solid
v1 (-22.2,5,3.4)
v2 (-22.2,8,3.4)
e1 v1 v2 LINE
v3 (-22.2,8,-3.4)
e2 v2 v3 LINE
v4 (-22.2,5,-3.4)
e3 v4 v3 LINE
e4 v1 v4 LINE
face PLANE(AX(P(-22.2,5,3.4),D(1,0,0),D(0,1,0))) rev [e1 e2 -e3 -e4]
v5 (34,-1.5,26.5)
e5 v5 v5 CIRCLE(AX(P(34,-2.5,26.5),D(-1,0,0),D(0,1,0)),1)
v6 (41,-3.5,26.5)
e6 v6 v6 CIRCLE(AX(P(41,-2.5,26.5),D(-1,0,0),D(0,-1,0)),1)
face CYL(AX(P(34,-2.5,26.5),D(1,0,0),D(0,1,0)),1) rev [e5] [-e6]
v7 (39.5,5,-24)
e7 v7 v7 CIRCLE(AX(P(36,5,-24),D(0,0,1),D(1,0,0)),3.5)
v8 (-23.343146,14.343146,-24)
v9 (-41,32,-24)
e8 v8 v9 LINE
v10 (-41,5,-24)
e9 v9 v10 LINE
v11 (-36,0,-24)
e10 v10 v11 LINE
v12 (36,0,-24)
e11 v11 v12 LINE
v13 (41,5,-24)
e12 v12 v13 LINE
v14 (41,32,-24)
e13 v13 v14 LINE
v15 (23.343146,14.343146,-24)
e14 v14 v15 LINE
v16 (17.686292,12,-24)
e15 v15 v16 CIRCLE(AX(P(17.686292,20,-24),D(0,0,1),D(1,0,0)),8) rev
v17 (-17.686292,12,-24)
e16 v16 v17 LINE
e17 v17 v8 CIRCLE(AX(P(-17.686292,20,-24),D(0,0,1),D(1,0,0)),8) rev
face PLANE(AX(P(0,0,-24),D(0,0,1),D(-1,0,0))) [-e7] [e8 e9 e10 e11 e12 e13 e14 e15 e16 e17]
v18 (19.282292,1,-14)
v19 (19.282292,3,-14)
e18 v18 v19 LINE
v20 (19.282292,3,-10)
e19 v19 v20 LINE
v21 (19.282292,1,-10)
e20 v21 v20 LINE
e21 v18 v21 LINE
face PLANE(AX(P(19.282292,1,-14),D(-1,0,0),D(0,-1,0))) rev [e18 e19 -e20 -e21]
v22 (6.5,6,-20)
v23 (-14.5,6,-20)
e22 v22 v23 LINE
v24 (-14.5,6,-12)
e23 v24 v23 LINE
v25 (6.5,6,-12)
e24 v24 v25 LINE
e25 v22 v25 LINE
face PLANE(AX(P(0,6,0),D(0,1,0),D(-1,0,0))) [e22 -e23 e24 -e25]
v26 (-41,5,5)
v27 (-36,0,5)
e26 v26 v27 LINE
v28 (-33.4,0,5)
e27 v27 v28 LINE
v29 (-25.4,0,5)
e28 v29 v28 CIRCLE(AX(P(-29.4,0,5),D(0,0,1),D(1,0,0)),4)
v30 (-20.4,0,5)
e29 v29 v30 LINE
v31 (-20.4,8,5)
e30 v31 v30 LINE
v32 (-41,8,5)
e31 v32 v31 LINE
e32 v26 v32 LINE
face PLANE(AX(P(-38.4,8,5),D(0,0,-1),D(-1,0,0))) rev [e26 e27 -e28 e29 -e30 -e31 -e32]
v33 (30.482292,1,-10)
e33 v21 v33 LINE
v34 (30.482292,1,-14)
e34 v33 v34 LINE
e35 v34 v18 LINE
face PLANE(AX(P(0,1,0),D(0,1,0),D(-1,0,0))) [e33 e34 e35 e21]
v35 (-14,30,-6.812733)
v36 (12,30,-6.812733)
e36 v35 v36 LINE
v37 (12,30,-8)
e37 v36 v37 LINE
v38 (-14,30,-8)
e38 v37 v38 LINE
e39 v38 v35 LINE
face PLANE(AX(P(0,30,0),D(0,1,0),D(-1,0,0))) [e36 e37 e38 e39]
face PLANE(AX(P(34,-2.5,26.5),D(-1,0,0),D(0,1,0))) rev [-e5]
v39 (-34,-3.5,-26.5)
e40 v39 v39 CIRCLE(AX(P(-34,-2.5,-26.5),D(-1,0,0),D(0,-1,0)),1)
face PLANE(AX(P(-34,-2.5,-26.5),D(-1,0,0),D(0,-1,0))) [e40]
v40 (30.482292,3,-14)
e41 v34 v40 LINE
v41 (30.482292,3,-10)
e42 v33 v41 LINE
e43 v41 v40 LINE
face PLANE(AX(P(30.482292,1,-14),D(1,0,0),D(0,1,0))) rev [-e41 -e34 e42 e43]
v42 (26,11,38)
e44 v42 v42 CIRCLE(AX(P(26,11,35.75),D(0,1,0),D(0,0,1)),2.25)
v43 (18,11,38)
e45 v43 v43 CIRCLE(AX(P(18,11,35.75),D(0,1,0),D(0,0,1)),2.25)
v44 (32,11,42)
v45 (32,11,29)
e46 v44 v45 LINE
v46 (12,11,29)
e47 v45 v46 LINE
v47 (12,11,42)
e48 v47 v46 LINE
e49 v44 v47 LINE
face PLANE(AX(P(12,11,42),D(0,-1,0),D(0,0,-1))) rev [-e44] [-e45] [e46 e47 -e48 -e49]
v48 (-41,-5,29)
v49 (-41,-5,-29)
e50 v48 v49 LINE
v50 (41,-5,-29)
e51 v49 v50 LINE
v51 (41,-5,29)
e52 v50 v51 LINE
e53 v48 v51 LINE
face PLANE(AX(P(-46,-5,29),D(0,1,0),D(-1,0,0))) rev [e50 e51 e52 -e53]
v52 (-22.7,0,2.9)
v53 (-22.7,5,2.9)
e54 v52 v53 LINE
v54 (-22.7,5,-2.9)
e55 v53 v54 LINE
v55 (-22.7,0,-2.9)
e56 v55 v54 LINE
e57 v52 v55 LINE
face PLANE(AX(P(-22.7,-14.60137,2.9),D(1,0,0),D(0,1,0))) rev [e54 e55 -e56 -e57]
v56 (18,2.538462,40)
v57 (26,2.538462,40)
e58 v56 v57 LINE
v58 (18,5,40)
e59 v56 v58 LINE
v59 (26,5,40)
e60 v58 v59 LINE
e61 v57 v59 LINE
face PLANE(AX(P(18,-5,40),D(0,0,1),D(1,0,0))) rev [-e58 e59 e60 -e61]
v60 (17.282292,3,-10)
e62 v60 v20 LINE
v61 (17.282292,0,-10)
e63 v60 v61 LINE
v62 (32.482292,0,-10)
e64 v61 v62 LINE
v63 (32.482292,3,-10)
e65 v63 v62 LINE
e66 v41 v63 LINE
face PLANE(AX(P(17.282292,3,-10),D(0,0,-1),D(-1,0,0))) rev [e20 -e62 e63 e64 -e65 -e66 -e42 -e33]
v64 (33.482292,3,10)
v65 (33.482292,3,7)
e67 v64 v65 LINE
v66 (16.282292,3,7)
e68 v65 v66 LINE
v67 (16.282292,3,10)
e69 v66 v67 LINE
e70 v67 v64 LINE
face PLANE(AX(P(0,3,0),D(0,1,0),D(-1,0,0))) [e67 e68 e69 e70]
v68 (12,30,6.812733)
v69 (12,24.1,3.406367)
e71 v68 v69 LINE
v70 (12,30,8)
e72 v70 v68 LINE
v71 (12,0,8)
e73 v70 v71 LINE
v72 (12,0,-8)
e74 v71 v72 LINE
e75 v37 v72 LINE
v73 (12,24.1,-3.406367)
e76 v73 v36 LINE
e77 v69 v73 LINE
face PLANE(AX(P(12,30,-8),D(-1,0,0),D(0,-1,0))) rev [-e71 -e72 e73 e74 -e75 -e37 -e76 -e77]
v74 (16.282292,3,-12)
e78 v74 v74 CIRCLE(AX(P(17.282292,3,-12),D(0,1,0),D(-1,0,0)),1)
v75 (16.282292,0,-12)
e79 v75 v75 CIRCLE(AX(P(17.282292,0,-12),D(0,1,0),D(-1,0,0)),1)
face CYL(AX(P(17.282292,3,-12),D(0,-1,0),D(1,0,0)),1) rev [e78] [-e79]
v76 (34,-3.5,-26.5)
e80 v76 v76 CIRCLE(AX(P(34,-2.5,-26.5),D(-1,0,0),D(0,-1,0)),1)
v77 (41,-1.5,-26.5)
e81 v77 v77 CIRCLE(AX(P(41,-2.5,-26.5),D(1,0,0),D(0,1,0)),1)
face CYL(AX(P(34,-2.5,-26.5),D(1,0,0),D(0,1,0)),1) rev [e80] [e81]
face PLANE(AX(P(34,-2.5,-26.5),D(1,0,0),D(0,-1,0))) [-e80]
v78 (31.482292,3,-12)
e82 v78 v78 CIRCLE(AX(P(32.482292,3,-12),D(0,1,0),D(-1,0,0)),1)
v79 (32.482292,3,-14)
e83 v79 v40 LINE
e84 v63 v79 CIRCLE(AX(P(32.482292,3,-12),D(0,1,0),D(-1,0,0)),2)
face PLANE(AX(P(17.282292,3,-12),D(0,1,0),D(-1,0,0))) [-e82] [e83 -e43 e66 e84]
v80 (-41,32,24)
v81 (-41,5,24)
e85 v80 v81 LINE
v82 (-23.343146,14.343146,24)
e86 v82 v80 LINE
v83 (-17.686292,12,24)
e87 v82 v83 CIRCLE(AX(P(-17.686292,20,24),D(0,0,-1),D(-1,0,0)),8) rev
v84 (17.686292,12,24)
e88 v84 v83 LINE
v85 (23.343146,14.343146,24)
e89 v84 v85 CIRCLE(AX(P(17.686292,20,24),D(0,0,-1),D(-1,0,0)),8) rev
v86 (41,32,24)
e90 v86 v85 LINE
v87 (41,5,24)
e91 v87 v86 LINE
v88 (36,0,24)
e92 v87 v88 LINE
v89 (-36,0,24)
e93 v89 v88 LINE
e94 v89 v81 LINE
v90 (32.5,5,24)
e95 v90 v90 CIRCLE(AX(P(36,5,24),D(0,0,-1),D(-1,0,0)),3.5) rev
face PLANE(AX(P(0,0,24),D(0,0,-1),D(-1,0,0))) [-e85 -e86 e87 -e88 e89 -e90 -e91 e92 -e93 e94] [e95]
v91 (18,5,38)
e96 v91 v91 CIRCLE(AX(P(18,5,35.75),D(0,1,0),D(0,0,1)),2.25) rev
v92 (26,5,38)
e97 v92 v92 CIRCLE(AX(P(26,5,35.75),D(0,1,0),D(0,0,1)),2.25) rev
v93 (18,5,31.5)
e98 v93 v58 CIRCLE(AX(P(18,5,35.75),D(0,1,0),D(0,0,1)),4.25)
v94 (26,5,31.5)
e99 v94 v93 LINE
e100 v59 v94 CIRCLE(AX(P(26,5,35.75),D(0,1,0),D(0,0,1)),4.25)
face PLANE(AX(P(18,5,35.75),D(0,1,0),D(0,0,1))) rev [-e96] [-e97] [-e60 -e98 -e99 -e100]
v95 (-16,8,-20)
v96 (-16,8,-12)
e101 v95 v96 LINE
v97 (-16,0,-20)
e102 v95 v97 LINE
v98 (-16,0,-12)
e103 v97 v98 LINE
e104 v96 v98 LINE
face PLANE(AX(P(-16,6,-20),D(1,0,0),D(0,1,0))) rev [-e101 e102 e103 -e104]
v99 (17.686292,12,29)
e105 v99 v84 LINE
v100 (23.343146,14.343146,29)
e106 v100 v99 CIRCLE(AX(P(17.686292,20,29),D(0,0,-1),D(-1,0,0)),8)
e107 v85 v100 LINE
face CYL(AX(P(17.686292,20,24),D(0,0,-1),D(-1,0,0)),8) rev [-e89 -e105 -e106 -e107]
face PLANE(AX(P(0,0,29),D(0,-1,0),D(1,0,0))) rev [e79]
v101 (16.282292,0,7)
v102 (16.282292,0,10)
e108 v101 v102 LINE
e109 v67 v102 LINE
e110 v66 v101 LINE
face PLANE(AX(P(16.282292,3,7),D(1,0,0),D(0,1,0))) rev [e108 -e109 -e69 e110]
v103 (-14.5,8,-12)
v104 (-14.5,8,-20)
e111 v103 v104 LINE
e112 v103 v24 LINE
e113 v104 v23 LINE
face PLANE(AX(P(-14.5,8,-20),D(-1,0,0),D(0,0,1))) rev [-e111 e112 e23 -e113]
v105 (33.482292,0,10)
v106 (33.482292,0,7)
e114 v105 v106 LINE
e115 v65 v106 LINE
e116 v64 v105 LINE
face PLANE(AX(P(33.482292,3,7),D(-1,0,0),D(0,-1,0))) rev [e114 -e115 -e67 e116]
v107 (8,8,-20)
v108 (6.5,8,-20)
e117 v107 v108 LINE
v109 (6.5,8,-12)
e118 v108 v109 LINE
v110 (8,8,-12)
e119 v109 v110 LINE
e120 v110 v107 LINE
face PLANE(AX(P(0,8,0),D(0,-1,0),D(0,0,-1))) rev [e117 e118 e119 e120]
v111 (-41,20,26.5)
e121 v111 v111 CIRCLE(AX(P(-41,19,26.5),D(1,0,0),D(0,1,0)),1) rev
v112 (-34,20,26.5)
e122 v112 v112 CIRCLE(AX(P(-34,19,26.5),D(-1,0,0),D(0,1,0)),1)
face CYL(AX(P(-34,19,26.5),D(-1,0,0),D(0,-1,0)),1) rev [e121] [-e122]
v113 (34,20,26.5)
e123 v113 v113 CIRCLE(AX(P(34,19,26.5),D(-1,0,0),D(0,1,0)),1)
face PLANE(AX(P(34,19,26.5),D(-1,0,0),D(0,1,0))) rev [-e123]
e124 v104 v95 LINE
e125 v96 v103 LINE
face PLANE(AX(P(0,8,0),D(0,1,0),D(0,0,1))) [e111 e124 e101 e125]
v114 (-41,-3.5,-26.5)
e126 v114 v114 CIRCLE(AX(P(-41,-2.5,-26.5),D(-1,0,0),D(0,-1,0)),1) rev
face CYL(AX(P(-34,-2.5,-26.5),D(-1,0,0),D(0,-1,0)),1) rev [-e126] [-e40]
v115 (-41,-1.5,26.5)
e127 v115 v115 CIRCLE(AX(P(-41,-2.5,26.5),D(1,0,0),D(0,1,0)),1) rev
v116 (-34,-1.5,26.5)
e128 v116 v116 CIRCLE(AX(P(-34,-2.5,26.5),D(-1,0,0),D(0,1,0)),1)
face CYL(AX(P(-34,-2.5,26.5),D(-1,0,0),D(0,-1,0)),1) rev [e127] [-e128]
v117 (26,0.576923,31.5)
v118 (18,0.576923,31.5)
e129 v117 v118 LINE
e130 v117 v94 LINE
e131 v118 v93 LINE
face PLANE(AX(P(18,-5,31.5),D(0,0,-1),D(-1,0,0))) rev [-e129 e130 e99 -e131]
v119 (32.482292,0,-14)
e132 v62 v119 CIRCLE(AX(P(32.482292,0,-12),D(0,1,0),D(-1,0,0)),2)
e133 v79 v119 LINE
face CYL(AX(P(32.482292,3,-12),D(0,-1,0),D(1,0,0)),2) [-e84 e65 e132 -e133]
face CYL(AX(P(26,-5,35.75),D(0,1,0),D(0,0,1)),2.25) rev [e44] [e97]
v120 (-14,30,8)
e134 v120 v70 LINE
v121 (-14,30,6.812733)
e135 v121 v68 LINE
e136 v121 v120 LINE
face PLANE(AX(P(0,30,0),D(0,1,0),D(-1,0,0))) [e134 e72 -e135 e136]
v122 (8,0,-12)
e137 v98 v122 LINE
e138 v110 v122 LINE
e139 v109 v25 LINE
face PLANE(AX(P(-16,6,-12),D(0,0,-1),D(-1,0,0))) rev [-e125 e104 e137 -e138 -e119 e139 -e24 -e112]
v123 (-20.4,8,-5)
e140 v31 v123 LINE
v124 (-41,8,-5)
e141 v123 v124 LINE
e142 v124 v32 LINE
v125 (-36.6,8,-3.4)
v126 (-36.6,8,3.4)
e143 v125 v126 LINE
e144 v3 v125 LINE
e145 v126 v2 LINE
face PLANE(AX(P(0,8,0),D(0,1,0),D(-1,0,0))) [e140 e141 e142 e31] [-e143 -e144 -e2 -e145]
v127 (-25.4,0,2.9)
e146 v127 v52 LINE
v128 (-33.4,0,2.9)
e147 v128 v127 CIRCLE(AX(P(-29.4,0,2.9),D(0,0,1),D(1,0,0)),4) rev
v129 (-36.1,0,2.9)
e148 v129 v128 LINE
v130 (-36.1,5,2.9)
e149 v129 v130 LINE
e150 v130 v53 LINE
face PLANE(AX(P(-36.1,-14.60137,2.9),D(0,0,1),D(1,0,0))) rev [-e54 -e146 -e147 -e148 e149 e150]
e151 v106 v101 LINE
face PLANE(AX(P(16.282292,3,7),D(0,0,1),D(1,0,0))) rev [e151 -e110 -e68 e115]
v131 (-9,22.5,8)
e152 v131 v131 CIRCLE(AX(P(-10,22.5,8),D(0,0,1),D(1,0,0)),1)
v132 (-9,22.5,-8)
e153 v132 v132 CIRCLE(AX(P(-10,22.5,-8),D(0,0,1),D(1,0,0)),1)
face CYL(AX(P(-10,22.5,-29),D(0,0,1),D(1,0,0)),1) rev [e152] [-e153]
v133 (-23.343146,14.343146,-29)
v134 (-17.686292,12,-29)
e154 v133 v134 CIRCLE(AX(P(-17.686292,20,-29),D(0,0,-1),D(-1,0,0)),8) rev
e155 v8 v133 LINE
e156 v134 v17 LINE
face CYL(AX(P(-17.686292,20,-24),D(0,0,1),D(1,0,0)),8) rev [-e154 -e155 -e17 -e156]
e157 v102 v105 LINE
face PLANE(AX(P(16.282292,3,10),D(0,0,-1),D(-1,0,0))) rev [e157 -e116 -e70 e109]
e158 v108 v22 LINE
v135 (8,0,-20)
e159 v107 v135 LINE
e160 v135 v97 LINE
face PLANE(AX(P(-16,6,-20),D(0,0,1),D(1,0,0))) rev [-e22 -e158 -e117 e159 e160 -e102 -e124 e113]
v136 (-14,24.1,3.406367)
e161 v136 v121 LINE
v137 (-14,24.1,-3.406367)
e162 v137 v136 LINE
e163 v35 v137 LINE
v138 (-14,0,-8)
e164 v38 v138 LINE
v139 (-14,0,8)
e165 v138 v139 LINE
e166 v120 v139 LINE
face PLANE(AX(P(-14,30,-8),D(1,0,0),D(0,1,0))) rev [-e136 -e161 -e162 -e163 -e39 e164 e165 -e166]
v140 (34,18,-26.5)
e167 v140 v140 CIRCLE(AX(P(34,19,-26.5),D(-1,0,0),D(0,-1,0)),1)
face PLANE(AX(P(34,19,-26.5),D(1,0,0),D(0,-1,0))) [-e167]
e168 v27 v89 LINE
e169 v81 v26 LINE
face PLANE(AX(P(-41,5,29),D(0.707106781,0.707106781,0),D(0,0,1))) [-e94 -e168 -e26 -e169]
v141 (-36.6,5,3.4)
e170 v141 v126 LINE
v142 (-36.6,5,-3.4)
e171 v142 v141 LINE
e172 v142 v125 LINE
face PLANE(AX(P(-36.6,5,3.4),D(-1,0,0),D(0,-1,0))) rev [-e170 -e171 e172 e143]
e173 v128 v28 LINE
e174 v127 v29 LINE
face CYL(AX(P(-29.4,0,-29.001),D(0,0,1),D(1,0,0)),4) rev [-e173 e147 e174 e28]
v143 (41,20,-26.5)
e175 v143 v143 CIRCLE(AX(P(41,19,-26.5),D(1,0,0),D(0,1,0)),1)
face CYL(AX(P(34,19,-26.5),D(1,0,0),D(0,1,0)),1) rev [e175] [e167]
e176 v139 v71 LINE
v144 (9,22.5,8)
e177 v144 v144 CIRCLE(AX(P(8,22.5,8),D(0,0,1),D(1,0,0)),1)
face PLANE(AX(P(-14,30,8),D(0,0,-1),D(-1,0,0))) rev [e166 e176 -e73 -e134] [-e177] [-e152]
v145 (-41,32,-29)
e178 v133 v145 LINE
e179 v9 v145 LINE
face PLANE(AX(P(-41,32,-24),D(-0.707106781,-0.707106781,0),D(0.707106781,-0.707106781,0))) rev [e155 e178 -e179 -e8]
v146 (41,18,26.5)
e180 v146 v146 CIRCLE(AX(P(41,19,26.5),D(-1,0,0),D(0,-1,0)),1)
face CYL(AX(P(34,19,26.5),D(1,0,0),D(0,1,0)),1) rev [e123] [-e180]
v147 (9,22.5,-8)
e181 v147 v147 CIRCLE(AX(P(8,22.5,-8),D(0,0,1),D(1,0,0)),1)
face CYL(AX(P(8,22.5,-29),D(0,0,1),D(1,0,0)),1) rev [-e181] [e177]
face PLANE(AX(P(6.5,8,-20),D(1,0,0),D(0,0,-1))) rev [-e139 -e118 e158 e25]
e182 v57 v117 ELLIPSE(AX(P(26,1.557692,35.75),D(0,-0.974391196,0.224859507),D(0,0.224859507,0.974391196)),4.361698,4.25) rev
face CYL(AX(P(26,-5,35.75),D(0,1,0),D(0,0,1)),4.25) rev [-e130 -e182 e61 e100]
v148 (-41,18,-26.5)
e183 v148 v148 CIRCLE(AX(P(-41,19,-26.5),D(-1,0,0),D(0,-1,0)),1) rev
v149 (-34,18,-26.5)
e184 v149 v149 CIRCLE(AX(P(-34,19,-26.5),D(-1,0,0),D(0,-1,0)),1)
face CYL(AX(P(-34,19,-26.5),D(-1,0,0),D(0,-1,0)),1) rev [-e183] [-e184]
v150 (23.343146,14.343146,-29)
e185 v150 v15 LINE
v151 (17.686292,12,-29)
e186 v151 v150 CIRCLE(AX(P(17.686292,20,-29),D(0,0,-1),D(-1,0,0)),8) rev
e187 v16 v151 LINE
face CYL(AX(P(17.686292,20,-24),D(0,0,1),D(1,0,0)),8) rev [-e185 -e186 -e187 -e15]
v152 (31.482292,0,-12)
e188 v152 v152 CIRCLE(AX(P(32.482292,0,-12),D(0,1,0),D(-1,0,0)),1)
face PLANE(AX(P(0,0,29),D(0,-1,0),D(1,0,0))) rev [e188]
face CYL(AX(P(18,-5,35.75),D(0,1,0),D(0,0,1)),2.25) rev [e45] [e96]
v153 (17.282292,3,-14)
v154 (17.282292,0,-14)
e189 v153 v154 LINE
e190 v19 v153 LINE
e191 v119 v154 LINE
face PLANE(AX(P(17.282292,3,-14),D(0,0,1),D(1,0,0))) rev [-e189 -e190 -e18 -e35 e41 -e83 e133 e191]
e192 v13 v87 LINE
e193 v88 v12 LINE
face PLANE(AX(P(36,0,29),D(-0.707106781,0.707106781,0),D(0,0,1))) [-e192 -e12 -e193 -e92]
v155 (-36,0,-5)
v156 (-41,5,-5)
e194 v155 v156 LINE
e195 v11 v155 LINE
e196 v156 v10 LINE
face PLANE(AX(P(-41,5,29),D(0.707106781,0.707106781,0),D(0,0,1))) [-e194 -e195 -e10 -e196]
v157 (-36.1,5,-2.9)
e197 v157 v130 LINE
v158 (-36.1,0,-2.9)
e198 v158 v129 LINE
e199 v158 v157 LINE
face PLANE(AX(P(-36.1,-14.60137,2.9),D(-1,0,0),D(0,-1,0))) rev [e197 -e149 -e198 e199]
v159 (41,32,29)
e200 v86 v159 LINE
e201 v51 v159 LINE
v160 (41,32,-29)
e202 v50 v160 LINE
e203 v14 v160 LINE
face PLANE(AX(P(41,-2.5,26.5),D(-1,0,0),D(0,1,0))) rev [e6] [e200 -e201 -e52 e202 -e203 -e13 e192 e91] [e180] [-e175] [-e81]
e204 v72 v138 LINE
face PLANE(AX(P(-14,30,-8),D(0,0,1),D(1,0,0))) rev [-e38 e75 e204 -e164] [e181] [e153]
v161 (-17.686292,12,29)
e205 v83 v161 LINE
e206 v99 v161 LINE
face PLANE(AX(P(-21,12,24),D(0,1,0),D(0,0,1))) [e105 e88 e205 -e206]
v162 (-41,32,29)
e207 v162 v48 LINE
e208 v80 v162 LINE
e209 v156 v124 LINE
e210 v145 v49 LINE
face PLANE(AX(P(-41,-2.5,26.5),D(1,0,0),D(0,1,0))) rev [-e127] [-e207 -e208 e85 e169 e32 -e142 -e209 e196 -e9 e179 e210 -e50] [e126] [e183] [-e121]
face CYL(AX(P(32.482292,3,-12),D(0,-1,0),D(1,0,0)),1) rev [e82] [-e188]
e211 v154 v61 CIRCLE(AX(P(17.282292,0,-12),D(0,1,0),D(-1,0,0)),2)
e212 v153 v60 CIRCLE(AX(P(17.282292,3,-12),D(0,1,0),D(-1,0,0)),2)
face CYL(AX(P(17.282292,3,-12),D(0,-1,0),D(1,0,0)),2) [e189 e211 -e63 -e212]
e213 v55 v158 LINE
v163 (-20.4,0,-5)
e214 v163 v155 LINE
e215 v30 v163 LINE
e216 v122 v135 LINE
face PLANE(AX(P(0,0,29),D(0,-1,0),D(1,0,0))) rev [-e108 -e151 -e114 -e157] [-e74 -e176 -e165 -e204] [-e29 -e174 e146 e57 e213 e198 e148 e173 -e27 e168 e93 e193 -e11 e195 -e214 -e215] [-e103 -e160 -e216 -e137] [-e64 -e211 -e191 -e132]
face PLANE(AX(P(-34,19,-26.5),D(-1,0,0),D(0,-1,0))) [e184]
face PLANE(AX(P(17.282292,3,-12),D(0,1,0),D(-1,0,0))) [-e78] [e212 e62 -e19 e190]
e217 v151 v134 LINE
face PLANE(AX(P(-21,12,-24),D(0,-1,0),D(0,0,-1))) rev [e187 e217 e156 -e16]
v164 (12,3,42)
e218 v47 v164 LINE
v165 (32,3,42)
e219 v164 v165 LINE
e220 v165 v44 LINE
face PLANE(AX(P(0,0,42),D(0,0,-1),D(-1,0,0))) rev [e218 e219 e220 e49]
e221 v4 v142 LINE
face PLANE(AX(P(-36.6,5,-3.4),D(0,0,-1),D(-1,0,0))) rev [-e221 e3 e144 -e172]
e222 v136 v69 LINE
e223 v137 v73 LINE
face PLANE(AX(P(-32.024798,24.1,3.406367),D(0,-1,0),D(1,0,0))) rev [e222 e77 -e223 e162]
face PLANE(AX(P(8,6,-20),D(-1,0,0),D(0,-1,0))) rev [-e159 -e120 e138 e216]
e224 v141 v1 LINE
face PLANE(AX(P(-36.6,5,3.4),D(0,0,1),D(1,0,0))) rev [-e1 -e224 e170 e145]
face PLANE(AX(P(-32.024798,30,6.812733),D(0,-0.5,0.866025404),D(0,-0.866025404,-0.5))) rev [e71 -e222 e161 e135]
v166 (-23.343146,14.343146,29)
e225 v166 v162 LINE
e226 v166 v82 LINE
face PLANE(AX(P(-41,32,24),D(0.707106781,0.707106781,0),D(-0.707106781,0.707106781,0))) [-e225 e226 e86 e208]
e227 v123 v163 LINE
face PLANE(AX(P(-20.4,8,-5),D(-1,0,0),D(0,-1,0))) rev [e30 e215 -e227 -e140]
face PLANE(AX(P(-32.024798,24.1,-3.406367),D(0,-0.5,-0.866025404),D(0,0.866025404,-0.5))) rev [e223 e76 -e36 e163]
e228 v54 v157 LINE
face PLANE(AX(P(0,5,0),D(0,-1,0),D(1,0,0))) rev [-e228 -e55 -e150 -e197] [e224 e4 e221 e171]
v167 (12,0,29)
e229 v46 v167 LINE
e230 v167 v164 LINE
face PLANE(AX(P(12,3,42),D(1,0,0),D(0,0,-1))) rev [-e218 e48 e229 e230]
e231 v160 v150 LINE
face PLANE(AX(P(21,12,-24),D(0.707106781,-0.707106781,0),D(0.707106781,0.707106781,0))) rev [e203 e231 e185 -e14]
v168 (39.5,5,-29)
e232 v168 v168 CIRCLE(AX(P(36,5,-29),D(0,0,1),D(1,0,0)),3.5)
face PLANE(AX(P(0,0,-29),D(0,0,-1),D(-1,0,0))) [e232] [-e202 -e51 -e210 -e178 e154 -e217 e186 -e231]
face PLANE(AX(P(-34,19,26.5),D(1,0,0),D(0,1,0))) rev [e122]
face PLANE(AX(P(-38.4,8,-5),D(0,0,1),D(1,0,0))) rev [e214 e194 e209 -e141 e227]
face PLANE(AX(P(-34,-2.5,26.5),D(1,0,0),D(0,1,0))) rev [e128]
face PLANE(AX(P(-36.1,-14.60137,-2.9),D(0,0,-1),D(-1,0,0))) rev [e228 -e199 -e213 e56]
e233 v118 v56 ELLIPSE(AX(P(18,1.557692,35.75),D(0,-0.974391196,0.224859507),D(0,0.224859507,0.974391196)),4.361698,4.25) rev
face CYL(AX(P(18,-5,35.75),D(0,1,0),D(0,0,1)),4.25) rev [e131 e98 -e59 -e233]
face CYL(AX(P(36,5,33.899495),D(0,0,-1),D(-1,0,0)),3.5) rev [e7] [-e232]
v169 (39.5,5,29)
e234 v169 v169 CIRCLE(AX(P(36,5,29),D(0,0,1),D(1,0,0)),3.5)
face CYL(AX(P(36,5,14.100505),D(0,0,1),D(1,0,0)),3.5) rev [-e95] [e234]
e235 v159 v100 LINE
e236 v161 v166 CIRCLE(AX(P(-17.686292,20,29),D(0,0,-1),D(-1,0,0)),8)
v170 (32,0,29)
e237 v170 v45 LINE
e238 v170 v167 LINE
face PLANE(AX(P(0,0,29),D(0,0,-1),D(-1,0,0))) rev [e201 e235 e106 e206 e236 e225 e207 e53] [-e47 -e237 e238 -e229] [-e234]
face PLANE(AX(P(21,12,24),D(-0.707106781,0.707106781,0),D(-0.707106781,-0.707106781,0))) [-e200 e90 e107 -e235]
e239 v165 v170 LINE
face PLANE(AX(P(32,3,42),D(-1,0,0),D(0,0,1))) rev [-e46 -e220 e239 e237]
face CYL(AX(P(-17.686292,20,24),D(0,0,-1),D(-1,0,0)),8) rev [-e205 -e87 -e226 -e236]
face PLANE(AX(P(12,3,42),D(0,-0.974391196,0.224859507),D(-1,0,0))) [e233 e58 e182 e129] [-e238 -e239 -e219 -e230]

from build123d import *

# Parameters (mm, degrees)
RESSALTO_EXTRUS_O1_DEPTH  = 29
CORTE_EXTRUS_O1_REACH     = 115.6
ESBO_O2_R                 = 6.5
ESBO_O3_R                 = 18
CORTE_EXTRUS_O2_DEPTH     = 2.5
CORTE_EXTRUS_O3_START     = -5
ESBO_O5_R                 = 2
ESBO_O5_R_2               = 1.5
CORTE_EXTRUS_O3_DEPTH     = 5
ESBO_O7_R                 = 12
ESBO_O7_R_2               = 2
CORTE_EXTRUS_O4_DEPTH     = 110.590145542
ESBO_O11_W                = 18
ESBO_O11_H                = 10
RESSALTO_EXTRUS_O3_DEPTH  = 8
ESBO_O12_W                = 14.4
ESBO_O12_H                = 6.8
CORTE_EXTRUS_O6_DEPTH     = 3
ESBO_O13_W                = 13.4
ESBO_O13_H                = 5.8
CORTE_EXTRUS_O7_DEPTH     = 5
CORTE_EXTRUS_O8_REACH     = 84.898
RESSALTO_EXTRUS_O4_DEPTH  = 5
ESBO_O17_W                = 2.6
ESBO_O17_H                = 10
RESSALTO_EXTRUS_O5_DEPTH  = 8
CHANFRO1_SIZE             = 5
FILETE1_R                 = 8
ESBO_O18_W                = 20
ESBO_O18_H                = 8
RESSALTO_EXTRUS_O6_DEPTH  = 13
ESBO_O19_R                = 2.25
CORTE_EXTRUS_O9_DEPTH     = 80.252760204
CHANFRO2_SIZE             = 3
CHANFRO2_SIZE_2           = 13
CORTE_EXTRUS_O10_START    = -6
CORTE_EXTRUS_O10_DEPTH    = 74.252760204
ESBO_O21_W                = 26
ESBO_O21_H                = 16
RESSALTO_EXTRUS_O7_DEPTH  = 30
CORTE_EXTRUS_O11_DEPTH    = 26
ESBO_O24_R                = 1
ESBO_O24_W                = 17.2
ESBO_O24_H                = 3
RESSALTO_EXTRUS_O8_DEPTH  = 3
ESBO_O25_W                = 11.2
ESBO_O25_H                = 4
CORTE_EXTRUS_O12_DEPTH    = 2
ESBO_O26_R                = 3.5
CORTE_EXTRUS_O13_DEPTH    = 5
ESBO_O27_W                = 24
ESBO_O27_H                = 8
RESSALTO_EXTRUS_O9_DEPTH  = 6
ESBO_O28_W                = 1.5
ESBO_O28_H                = 8
RESSALTO_EXTRUS_O10_DEPTH = 2
ESBO_O31_R                = 1
CORTE_EXTRUS_O14_DEPTH    = 85.172442046
ESBO_O32_R                = 1
CORTE_EXTRUS_O15_DEPTH    = 12
ESBO_O33_R                = 1.25
CORTE_EXTRUS_O16_DEPTH    = 5
CORTE_EXTRUS_O17_DEPTH    = 2
ESBO_O38_R                = 62.548775677
CORTE_EXTRUS_O20_DEPTH    = 114.723348526
ESBO_O39_R                = 54.583555182
CORTE_EXTRUS_O21_DEPTH    = 110.945441015


with BuildPart() as part:
    # Esboço1 → Ressalto-extrusão1 (new, symmetric)
    with BuildSketch(Plane.XY):
        Polygon((0, 0), (-41, 0), (-41, 60), (-46, 60), (-46, -5), (46, -5), (46, 60), (41, 60), (41, 0), align=None)
    extrude(amount=RESSALTO_EXTRUS_O1_DEPTH, both=True)

    # Esboço2 → Corte-extrusão1 (cut, up to next)
    with BuildSketch(Plane.ZY.offset(46), mode=Mode.PRIVATE) as corte_extrus_o1_sk1:
        with Locations(Location((0, 30, 0), (0, 0, 270))):
            Circle(ESBO_O2_R)
    corte_extrus_o1_tool1 = extrude(corte_extrus_o1_sk1.sketch, amount=-CORTE_EXTRUS_O1_REACH, mode=Mode.PRIVATE) & part.part
    add(corte_extrus_o1_tool1.solids().sort_by_distance((-46, 30, 0))[0], mode=Mode.SUBTRACT)

    # Esboço3 → Corte-extrusão2 (cut)
    with BuildSketch(Plane.ZY.offset(46)):
        with Locations(Location((0, 30, 0), (0, 0, 270))):
            Circle(ESBO_O3_R)
    extrude(amount=-CORTE_EXTRUS_O2_DEPTH, mode=Mode.SUBTRACT)

    # Esboço5 → Corte-extrusão3 (cut)
    with BuildSketch(Plane.ZY.offset(46).offset(CORTE_EXTRUS_O3_START)):
        with Locations(Location((-15.5, 45.5, 0), (0, 0, 270))):
            Circle(ESBO_O5_R)
        with Locations(Location((0, 42, 0), (0, 0, 270))):
            Circle(ESBO_O5_R_2)
        with Locations(Location((0, 18, 0), (0, 0, 270))):
            Circle(ESBO_O5_R_2)
        with Locations(Location((0, 54, 0), (0, 0, 270))):
            Circle(ESBO_O5_R)
        with Locations(Location((15.5, 45.5, 0), (0, 0, 270))):
            Circle(ESBO_O5_R)
        with Locations(Location((15.5, 14.5, 0), (0, 0, 270))):
            Circle(ESBO_O5_R)
        with Locations(Location((-15.5, 14.5, 0), (0, 0, 270))):
            Circle(ESBO_O5_R)
        with Locations(Location((20.784609691, 18, 0), (0, 0, 270))):
            Circle(ESBO_O5_R)
        with Locations(Location((-20.784609691, 18, 0), (0, 0, 270))):
            Circle(ESBO_O5_R)
        with BuildLine():
            Line((-8, 31.5), (8, 31.5))
            ThreePointArc((8, 31.5), (9.5, 30), (8, 28.5))
            Line((8, 28.5), (-8, 28.5))
            ThreePointArc((-8, 28.5), (-9.5, 30), (-8, 31.5))
        make_face()
    extrude(amount=CORTE_EXTRUS_O3_DEPTH, mode=Mode.SUBTRACT)

    # Esboço7 → Corte-extrusão4 (cut, through all)
    with BuildSketch(Plane.ZY.offset(-41)):
        with Locations(Location((0, 30, 0), (0, 0, 270))):
            Circle(ESBO_O7_R)
        with Locations(Location((-15.5, 45.5, 0), (0, 0, 270))):
            Circle(ESBO_O7_R_2)
        with Locations(Location((15.5, 45.5, 0), (0, 0, 270))):
            Circle(ESBO_O7_R_2)
        with Locations(Location((15.5, 14.5, 0), (0, 0, 270))):
            Circle(ESBO_O7_R_2)
        with Locations(Location((-15.5, 14.5, 0), (0, 0, 270))):
            Circle(ESBO_O7_R_2)
    extrude(amount=-CORTE_EXTRUS_O4_DEPTH, mode=Mode.SUBTRACT)

    # Esboço11 → Ressalto-extrusão3 (add)
    with BuildSketch(Plane(origin=(0, 0, 0), x_dir=(1, 0, 0), z_dir=(0, 1, 0))):
        with Locations((-29.4, 0)):
            Rectangle(ESBO_O11_W, ESBO_O11_H)
    extrude(amount=RESSALTO_EXTRUS_O3_DEPTH)

    # Esboço12 → Corte-extrusão6 (cut)
    with BuildSketch(Plane(origin=(0, 8, 0), x_dir=(1, 0, 0), z_dir=(0, 1, 0))):
        with Locations((-29.4, 0)):
            Rectangle(ESBO_O12_W, ESBO_O12_H)
    extrude(amount=-CORTE_EXTRUS_O6_DEPTH, mode=Mode.SUBTRACT)

    # Esboço13 → Corte-extrusão7 (cut)
    with BuildSketch(Plane(origin=(0, 5, 0), x_dir=(1, 0, 0), z_dir=(0, 1, 0))):
        with Locations((-29.4, 0)):
            Rectangle(ESBO_O13_W, ESBO_O13_H)
    extrude(amount=-CORTE_EXTRUS_O7_DEPTH, mode=Mode.SUBTRACT)

    # Esboço14 → Corte-extrusão8 (cut, up to next)
    with BuildSketch(Plane.XY.offset(5), mode=Mode.PRIVATE) as corte_extrus_o8_sk1:
        with BuildLine():
            Line((-33.4, 0), (-25.4, 0))
            ThreePointArc((-25.4, 0), (-29.4, 4), (-33.4, 0))
        make_face()
    corte_extrus_o8_tool1 = extrude(corte_extrus_o8_sk1.sketch, amount=-CORTE_EXTRUS_O8_REACH, mode=Mode.PRIVATE) & part.part
    add(corte_extrus_o8_tool1.solids().sort_by_distance((-29.4, 1.697653, 5))[0], mode=Mode.SUBTRACT)

    # Esboço16 → Ressalto-extrusão4 (add)
    with BuildSketch(Plane.XY.offset(29)):
        Polygon((-41, 32), (-21, 12), (21, 12), (41, 32), (41, 0), (-41, 0), align=None)
    ressalto_extrus_o4 = extrude(amount=-RESSALTO_EXTRUS_O4_DEPTH)

    # Espelhar1: Ressalto-extrusão4 across plane
    add(ressalto_extrus_o4.mirror(Plane.XY))

    # Esboço17 → Ressalto-extrusão5 (add)
    with BuildSketch(Plane(origin=(0, 8, 0), x_dir=(1, 0, 0), z_dir=(0, 1, 0))):
        with Locations((-39.7, 0)):
            Rectangle(ESBO_O17_W, ESBO_O17_H)
    extrude(amount=-RESSALTO_EXTRUS_O5_DEPTH)

    # Chanfro1
    chanfro1_edges = [part.edges().sort_by_distance(p)[0] for p in [
        (41, 0, 0),
        (-41, 0, 14.5),
        (-41, 0, -14.5),
    ]]
    chamfer(chanfro1_edges, length=CHANFRO1_SIZE)

    # Filete1
    filete1_edges = [part.edges().sort_by_distance(p)[0] for p in [
        (-43.5, 60, -29),
        (-43.5, 60, 29),
        (-21, 12, 26.5),
        (21, 12, 26.5),
        (21, 12, -26.5),
        (-21, 12, -26.5),
        (43.5, 60, 29),
        (43.5, 60, -29),
    ]]
    fillet(filete1_edges, radius=FILETE1_R)

    # Esboço18 → Ressalto-extrusão6 (add)
    with BuildSketch(Plane.XY.offset(29)):
        with Locations((22, 7)):
            Rectangle(ESBO_O18_W, ESBO_O18_H)
    extrude(amount=RESSALTO_EXTRUS_O6_DEPTH)

    # Esboço19 → Corte-extrusão9 (cut, through all)
    with BuildSketch(Plane(origin=(0, 11, 0), x_dir=(1, 0, 0), z_dir=(0, 1, 0))):
        with Locations(Location((18, -35.75, 0), (0, 0, 270))):
            Circle(ESBO_O19_R)
        with Locations(Location((26, -35.75, 0), (0, 0, 270))):
            Circle(ESBO_O19_R)
    extrude(amount=-CORTE_EXTRUS_O9_DEPTH, mode=Mode.SUBTRACT)

    # Chanfro2
    # the kernel refuses this chamfer: 13, 3 mm, written as the material it adds along each edge
    with BuildSketch(Plane(origin=(12, 3, 29), x_dir=(0, -0.987043568605235, -0.1604524654688814), z_dir=(1, 0, 0))) as chanfro2_piece_1_section:
        Polygon((CHANFRO2_SIZE * 0.987043568605, -CHANFRO2_SIZE * 0.160452465469), (-CHANFRO2_SIZE_2 * 0.160452465469, -CHANFRO2_SIZE_2 * 0.987043568605), (0, 0), align=None)
    chanfro2_piece_1 = extrude(amount=20, mode=Mode.PRIVATE)
    chanfro2_piece_1 = split(chanfro2_piece_1, bisect_by=Plane(origin=(21.999997786, 2.099377296, 42), z_dir=(0, 0, -1)), keep=Keep.TOP, mode=Mode.PRIVATE)
    chanfro2_piece_1 = chanfro2_piece_1 - Plane(origin=(18, 2.099377296, 35.75), x_dir=(0, 0, 1), z_dir=(0, 1, 0)) * Cylinder(2.25, 92, mode=Mode.PRIVATE)
    chanfro2_piece_1 = chanfro2_piece_1 - Plane(origin=(26, 2.099377296, 35.75), x_dir=(0, 0, 1), z_dir=(0, 1, 0)) * Cylinder(2.25, 92, mode=Mode.PRIVATE)
    add(chanfro2_piece_1)

    # Esboço20 → Corte-extrusão10 (cut, through all)
    with BuildSketch(Plane(origin=(0, 11, 0), x_dir=(1, 0, 0), z_dir=(0, 1, 0)).offset(CORTE_EXTRUS_O10_START)):
        with BuildLine():
            Line((18, -31.5), (26, -31.5))
            ThreePointArc((26, -31.5), (30.25, -35.75), (26, -40))
            Line((26, -40), (18, -40))
            ThreePointArc((18, -40), (13.75, -35.75), (18, -31.5))
        make_face()
    extrude(amount=-CORTE_EXTRUS_O10_DEPTH, mode=Mode.SUBTRACT)

    # Esboço21 → Ressalto-extrusão7 (add)
    with BuildSketch(Plane(origin=(0, 0, 0), x_dir=(1, 0, 0), z_dir=(0, 1, 0))):
        with Locations((-1, 0)):
            Rectangle(ESBO_O21_W, ESBO_O21_H)
    extrude(amount=RESSALTO_EXTRUS_O7_DEPTH)

    # Esboço22 → Corte-extrusão11 (cut)
    with BuildSketch(Plane(origin=(12, 0, 0), x_dir=(0, 0, -1), z_dir=(1, 0, 0))):
        Polygon((6.812733176, 30), (3.406366588, 35.9), (-3.406366588, 35.9), (-6.812733176, 30), (-3.406366588, 24.1), (3.406366588, 24.1), align=None)
    extrude(amount=-CORTE_EXTRUS_O11_DEPTH, mode=Mode.SUBTRACT)

    # Esboço24 → Ressalto-extrusão8 (add)
    # profile 1 of 2: a face of its own
    with BuildSketch(Plane(origin=(0, 0, 0), x_dir=(1, 0, 0), z_dir=(0, 1, 0))):
        with BuildLine():
            Line((17.282291959, 14), (32.482291959, 14))
            ThreePointArc((32.482291959, 14), (34.482291959, 12), (32.482291959, 10))
            Line((32.482291959, 10), (17.282291959, 10))
            ThreePointArc((17.282291959, 10), (15.282291959, 12), (17.282291959, 14))
        make_face()
        with Locations(Location((17.282291959, 12, 0), (0, 0, 180))):
            Circle(ESBO_O24_R, mode=Mode.SUBTRACT)
        with Locations(Location((32.482291959, 12, 0), (0, 0, 180))):
            Circle(ESBO_O24_R, mode=Mode.SUBTRACT)
    # profile 2 of 2: a face of its own
    with BuildSketch(Plane(origin=(0, 0, 0), x_dir=(1, 0, 0), z_dir=(0, 1, 0))):
        with Locations((24.882291959, -8.5)):
            Rectangle(ESBO_O24_W, ESBO_O24_H)
    extrude(amount=RESSALTO_EXTRUS_O8_DEPTH)

    # Esboço25 → Corte-extrusão12 (cut)
    with BuildSketch(Plane(origin=(0, 3, 0), x_dir=(1, 0, 0), z_dir=(0, 1, 0))):
        with Locations((24.882291959, 12)):
            Rectangle(ESBO_O25_W, ESBO_O25_H)
    extrude(amount=-CORTE_EXTRUS_O12_DEPTH, mode=Mode.SUBTRACT)

    # Esboço26 → Corte-extrusão13 (cut)
    with BuildSketch(Plane.XY.offset(29)):
        with Locations((36, 5)):
            Circle(ESBO_O26_R)
    corte_extrus_o13 = extrude(amount=-CORTE_EXTRUS_O13_DEPTH, mode=Mode.SUBTRACT)

    # Esboço27 → Ressalto-extrusão9 (add)
    with BuildSketch(Plane(origin=(0, 0, 0), x_dir=(1, 0, 0), z_dir=(0, 1, 0))):
        with Locations((-4, 16)):
            Rectangle(ESBO_O27_W, ESBO_O27_H)
    extrude(amount=RESSALTO_EXTRUS_O9_DEPTH)

    # Esboço28 → Ressalto-extrusão10 (add)
    with BuildSketch(Plane(origin=(0, 6, 0), x_dir=(1, 0, 0), z_dir=(0, 1, 0))):
        with Locations((-15.25, 16)):
            Rectangle(ESBO_O28_W, ESBO_O28_H)
        with Locations((7.25, 16)):
            Rectangle(ESBO_O28_W, ESBO_O28_H)
    extrude(amount=RESSALTO_EXTRUS_O10_DEPTH)

    # Esboço31 → Corte-extrusão14 (cut, through all)
    with BuildSketch(Plane.XY.offset(8)):
        with Locations((-10, 22.5)):
            Circle(ESBO_O31_R)
        with Locations((8, 22.5)):
            Circle(ESBO_O31_R)
    extrude(amount=-CORTE_EXTRUS_O14_DEPTH, mode=Mode.SUBTRACT)

    # Esboço32 → Corte-extrusão15 (cut)
    with BuildSketch(Plane.ZY.offset(46)):
        with Locations(Location((-26.5, -2.5, 0), (0, 0, 270))):
            Circle(ESBO_O32_R)
        with Locations(Location((-26.5, 19, 0), (0, 0, 270))):
            Circle(ESBO_O32_R)
        with Locations(Location((26.5, 19, 0), (0, 0, 90))):
            Circle(ESBO_O32_R)
        with Locations(Location((26.5, -2.5, 0), (0, 0, 90))):
            Circle(ESBO_O32_R)
    corte_extrus_o15 = extrude(amount=-CORTE_EXTRUS_O15_DEPTH, mode=Mode.SUBTRACT)

    # Esboço33 → Corte-extrusão16 (cut)
    with BuildSketch(Plane.ZY.offset(46)):
        with Locations(Location((-26.5, -2.5, 0), (0, 0, 270))):
            Circle(ESBO_O33_R)
        with Locations(Location((-26.5, 19, 0), (0, 0, 270))):
            Circle(ESBO_O33_R)
        with Locations(Location((26.5, 19, 0), (0, 0, 90))):
            Circle(ESBO_O33_R)
        with Locations(Location((26.5, -2.5, 0), (0, 0, 90))):
            Circle(ESBO_O33_R)
    corte_extrus_o16 = extrude(amount=-CORTE_EXTRUS_O16_DEPTH, mode=Mode.SUBTRACT)

    # Esboço34 → Corte-extrusão17 (cut)
    with BuildSketch(Plane.ZY.offset(46)):
        with BuildLine():
            Line((-26.5, -0.25), (-29, -0.25))
            Line((-29, -0.25), (-29, -5))
            Line((-29, -5), (-24.25, -5))
            Line((-24.25, -5), (-24.25, -2.5))
            ThreePointArc((-24.25, -2.5), (-24.909009742, -0.909009742), (-26.5, -0.25))
        make_face()
        with BuildLine():
            Line((-26.5, 21.25), (-29, 21.25))
            Line((-29, 21.25), (-29, 16.75))
            Line((-29, 16.75), (-26.5, 16.75))
            ThreePointArc((-26.5, 16.75), (-24.25, 19), (-26.5, 21.25))
        make_face()
        with BuildLine():
            Line((29, 16.75), (29, 21.25))
            Line((29, 21.25), (26.5, 21.25))
            ThreePointArc((26.5, 21.25), (24.25, 19), (26.5, 16.75))
            Line((26.5, 16.75), (29, 16.75))
        make_face()
        with BuildLine():
            Line((29, -5), (24.25, -5))
            Line((24.25, -5), (24.25, -2.5))
            ThreePointArc((24.25, -2.5), (24.909009742, -0.909009742), (26.5, -0.25))
            Line((26.5, -0.25), (29, -0.25))
            Line((29, -0.25), (29, -5))
        make_face()
    corte_extrus_o17 = extrude(amount=-CORTE_EXTRUS_O17_DEPTH, mode=Mode.SUBTRACT)

    # Espelhar2: Corte-extrusão15, Corte-extrusão16, Corte-extrusão17 across plane
    add(corte_extrus_o15.mirror(Plane(origin=(0, 0, 0), x_dir=(0, 0, 1), z_dir=(1, 0, 0))), mode=Mode.SUBTRACT)
    add(corte_extrus_o16.mirror(Plane(origin=(0, 0, 0), x_dir=(0, 0, 1), z_dir=(1, 0, 0))), mode=Mode.SUBTRACT)
    add(corte_extrus_o17.mirror(Plane(origin=(0, 0, 0), x_dir=(0, 0, 1), z_dir=(1, 0, 0))), mode=Mode.SUBTRACT)

    # Esboço38 → Corte-extrusão20 (cut, through all)
    with BuildSketch(Plane.ZY.offset(-41)):
        with Locations((0, 30)):
            Circle(ESBO_O38_R)
    extrude(amount=-CORTE_EXTRUS_O20_DEPTH, mode=Mode.SUBTRACT)

    # Esboço39 → Corte-extrusão21 (cut, through all)
    with BuildSketch(Plane(origin=(-41, 0, 0), x_dir=(0, 0, -1), z_dir=(1, 0, 0))):
        with Locations((0, 30)):
            Circle(ESBO_O39_R)
    extrude(amount=-CORTE_EXTRUS_O21_DEPTH, mode=Mode.SUBTRACT)

    # Espelhar3: Corte-extrusão13 across plane
    add(corte_extrus_o13.mirror(Plane.XY), mode=Mode.SUBTRACT)


solid = part.part
